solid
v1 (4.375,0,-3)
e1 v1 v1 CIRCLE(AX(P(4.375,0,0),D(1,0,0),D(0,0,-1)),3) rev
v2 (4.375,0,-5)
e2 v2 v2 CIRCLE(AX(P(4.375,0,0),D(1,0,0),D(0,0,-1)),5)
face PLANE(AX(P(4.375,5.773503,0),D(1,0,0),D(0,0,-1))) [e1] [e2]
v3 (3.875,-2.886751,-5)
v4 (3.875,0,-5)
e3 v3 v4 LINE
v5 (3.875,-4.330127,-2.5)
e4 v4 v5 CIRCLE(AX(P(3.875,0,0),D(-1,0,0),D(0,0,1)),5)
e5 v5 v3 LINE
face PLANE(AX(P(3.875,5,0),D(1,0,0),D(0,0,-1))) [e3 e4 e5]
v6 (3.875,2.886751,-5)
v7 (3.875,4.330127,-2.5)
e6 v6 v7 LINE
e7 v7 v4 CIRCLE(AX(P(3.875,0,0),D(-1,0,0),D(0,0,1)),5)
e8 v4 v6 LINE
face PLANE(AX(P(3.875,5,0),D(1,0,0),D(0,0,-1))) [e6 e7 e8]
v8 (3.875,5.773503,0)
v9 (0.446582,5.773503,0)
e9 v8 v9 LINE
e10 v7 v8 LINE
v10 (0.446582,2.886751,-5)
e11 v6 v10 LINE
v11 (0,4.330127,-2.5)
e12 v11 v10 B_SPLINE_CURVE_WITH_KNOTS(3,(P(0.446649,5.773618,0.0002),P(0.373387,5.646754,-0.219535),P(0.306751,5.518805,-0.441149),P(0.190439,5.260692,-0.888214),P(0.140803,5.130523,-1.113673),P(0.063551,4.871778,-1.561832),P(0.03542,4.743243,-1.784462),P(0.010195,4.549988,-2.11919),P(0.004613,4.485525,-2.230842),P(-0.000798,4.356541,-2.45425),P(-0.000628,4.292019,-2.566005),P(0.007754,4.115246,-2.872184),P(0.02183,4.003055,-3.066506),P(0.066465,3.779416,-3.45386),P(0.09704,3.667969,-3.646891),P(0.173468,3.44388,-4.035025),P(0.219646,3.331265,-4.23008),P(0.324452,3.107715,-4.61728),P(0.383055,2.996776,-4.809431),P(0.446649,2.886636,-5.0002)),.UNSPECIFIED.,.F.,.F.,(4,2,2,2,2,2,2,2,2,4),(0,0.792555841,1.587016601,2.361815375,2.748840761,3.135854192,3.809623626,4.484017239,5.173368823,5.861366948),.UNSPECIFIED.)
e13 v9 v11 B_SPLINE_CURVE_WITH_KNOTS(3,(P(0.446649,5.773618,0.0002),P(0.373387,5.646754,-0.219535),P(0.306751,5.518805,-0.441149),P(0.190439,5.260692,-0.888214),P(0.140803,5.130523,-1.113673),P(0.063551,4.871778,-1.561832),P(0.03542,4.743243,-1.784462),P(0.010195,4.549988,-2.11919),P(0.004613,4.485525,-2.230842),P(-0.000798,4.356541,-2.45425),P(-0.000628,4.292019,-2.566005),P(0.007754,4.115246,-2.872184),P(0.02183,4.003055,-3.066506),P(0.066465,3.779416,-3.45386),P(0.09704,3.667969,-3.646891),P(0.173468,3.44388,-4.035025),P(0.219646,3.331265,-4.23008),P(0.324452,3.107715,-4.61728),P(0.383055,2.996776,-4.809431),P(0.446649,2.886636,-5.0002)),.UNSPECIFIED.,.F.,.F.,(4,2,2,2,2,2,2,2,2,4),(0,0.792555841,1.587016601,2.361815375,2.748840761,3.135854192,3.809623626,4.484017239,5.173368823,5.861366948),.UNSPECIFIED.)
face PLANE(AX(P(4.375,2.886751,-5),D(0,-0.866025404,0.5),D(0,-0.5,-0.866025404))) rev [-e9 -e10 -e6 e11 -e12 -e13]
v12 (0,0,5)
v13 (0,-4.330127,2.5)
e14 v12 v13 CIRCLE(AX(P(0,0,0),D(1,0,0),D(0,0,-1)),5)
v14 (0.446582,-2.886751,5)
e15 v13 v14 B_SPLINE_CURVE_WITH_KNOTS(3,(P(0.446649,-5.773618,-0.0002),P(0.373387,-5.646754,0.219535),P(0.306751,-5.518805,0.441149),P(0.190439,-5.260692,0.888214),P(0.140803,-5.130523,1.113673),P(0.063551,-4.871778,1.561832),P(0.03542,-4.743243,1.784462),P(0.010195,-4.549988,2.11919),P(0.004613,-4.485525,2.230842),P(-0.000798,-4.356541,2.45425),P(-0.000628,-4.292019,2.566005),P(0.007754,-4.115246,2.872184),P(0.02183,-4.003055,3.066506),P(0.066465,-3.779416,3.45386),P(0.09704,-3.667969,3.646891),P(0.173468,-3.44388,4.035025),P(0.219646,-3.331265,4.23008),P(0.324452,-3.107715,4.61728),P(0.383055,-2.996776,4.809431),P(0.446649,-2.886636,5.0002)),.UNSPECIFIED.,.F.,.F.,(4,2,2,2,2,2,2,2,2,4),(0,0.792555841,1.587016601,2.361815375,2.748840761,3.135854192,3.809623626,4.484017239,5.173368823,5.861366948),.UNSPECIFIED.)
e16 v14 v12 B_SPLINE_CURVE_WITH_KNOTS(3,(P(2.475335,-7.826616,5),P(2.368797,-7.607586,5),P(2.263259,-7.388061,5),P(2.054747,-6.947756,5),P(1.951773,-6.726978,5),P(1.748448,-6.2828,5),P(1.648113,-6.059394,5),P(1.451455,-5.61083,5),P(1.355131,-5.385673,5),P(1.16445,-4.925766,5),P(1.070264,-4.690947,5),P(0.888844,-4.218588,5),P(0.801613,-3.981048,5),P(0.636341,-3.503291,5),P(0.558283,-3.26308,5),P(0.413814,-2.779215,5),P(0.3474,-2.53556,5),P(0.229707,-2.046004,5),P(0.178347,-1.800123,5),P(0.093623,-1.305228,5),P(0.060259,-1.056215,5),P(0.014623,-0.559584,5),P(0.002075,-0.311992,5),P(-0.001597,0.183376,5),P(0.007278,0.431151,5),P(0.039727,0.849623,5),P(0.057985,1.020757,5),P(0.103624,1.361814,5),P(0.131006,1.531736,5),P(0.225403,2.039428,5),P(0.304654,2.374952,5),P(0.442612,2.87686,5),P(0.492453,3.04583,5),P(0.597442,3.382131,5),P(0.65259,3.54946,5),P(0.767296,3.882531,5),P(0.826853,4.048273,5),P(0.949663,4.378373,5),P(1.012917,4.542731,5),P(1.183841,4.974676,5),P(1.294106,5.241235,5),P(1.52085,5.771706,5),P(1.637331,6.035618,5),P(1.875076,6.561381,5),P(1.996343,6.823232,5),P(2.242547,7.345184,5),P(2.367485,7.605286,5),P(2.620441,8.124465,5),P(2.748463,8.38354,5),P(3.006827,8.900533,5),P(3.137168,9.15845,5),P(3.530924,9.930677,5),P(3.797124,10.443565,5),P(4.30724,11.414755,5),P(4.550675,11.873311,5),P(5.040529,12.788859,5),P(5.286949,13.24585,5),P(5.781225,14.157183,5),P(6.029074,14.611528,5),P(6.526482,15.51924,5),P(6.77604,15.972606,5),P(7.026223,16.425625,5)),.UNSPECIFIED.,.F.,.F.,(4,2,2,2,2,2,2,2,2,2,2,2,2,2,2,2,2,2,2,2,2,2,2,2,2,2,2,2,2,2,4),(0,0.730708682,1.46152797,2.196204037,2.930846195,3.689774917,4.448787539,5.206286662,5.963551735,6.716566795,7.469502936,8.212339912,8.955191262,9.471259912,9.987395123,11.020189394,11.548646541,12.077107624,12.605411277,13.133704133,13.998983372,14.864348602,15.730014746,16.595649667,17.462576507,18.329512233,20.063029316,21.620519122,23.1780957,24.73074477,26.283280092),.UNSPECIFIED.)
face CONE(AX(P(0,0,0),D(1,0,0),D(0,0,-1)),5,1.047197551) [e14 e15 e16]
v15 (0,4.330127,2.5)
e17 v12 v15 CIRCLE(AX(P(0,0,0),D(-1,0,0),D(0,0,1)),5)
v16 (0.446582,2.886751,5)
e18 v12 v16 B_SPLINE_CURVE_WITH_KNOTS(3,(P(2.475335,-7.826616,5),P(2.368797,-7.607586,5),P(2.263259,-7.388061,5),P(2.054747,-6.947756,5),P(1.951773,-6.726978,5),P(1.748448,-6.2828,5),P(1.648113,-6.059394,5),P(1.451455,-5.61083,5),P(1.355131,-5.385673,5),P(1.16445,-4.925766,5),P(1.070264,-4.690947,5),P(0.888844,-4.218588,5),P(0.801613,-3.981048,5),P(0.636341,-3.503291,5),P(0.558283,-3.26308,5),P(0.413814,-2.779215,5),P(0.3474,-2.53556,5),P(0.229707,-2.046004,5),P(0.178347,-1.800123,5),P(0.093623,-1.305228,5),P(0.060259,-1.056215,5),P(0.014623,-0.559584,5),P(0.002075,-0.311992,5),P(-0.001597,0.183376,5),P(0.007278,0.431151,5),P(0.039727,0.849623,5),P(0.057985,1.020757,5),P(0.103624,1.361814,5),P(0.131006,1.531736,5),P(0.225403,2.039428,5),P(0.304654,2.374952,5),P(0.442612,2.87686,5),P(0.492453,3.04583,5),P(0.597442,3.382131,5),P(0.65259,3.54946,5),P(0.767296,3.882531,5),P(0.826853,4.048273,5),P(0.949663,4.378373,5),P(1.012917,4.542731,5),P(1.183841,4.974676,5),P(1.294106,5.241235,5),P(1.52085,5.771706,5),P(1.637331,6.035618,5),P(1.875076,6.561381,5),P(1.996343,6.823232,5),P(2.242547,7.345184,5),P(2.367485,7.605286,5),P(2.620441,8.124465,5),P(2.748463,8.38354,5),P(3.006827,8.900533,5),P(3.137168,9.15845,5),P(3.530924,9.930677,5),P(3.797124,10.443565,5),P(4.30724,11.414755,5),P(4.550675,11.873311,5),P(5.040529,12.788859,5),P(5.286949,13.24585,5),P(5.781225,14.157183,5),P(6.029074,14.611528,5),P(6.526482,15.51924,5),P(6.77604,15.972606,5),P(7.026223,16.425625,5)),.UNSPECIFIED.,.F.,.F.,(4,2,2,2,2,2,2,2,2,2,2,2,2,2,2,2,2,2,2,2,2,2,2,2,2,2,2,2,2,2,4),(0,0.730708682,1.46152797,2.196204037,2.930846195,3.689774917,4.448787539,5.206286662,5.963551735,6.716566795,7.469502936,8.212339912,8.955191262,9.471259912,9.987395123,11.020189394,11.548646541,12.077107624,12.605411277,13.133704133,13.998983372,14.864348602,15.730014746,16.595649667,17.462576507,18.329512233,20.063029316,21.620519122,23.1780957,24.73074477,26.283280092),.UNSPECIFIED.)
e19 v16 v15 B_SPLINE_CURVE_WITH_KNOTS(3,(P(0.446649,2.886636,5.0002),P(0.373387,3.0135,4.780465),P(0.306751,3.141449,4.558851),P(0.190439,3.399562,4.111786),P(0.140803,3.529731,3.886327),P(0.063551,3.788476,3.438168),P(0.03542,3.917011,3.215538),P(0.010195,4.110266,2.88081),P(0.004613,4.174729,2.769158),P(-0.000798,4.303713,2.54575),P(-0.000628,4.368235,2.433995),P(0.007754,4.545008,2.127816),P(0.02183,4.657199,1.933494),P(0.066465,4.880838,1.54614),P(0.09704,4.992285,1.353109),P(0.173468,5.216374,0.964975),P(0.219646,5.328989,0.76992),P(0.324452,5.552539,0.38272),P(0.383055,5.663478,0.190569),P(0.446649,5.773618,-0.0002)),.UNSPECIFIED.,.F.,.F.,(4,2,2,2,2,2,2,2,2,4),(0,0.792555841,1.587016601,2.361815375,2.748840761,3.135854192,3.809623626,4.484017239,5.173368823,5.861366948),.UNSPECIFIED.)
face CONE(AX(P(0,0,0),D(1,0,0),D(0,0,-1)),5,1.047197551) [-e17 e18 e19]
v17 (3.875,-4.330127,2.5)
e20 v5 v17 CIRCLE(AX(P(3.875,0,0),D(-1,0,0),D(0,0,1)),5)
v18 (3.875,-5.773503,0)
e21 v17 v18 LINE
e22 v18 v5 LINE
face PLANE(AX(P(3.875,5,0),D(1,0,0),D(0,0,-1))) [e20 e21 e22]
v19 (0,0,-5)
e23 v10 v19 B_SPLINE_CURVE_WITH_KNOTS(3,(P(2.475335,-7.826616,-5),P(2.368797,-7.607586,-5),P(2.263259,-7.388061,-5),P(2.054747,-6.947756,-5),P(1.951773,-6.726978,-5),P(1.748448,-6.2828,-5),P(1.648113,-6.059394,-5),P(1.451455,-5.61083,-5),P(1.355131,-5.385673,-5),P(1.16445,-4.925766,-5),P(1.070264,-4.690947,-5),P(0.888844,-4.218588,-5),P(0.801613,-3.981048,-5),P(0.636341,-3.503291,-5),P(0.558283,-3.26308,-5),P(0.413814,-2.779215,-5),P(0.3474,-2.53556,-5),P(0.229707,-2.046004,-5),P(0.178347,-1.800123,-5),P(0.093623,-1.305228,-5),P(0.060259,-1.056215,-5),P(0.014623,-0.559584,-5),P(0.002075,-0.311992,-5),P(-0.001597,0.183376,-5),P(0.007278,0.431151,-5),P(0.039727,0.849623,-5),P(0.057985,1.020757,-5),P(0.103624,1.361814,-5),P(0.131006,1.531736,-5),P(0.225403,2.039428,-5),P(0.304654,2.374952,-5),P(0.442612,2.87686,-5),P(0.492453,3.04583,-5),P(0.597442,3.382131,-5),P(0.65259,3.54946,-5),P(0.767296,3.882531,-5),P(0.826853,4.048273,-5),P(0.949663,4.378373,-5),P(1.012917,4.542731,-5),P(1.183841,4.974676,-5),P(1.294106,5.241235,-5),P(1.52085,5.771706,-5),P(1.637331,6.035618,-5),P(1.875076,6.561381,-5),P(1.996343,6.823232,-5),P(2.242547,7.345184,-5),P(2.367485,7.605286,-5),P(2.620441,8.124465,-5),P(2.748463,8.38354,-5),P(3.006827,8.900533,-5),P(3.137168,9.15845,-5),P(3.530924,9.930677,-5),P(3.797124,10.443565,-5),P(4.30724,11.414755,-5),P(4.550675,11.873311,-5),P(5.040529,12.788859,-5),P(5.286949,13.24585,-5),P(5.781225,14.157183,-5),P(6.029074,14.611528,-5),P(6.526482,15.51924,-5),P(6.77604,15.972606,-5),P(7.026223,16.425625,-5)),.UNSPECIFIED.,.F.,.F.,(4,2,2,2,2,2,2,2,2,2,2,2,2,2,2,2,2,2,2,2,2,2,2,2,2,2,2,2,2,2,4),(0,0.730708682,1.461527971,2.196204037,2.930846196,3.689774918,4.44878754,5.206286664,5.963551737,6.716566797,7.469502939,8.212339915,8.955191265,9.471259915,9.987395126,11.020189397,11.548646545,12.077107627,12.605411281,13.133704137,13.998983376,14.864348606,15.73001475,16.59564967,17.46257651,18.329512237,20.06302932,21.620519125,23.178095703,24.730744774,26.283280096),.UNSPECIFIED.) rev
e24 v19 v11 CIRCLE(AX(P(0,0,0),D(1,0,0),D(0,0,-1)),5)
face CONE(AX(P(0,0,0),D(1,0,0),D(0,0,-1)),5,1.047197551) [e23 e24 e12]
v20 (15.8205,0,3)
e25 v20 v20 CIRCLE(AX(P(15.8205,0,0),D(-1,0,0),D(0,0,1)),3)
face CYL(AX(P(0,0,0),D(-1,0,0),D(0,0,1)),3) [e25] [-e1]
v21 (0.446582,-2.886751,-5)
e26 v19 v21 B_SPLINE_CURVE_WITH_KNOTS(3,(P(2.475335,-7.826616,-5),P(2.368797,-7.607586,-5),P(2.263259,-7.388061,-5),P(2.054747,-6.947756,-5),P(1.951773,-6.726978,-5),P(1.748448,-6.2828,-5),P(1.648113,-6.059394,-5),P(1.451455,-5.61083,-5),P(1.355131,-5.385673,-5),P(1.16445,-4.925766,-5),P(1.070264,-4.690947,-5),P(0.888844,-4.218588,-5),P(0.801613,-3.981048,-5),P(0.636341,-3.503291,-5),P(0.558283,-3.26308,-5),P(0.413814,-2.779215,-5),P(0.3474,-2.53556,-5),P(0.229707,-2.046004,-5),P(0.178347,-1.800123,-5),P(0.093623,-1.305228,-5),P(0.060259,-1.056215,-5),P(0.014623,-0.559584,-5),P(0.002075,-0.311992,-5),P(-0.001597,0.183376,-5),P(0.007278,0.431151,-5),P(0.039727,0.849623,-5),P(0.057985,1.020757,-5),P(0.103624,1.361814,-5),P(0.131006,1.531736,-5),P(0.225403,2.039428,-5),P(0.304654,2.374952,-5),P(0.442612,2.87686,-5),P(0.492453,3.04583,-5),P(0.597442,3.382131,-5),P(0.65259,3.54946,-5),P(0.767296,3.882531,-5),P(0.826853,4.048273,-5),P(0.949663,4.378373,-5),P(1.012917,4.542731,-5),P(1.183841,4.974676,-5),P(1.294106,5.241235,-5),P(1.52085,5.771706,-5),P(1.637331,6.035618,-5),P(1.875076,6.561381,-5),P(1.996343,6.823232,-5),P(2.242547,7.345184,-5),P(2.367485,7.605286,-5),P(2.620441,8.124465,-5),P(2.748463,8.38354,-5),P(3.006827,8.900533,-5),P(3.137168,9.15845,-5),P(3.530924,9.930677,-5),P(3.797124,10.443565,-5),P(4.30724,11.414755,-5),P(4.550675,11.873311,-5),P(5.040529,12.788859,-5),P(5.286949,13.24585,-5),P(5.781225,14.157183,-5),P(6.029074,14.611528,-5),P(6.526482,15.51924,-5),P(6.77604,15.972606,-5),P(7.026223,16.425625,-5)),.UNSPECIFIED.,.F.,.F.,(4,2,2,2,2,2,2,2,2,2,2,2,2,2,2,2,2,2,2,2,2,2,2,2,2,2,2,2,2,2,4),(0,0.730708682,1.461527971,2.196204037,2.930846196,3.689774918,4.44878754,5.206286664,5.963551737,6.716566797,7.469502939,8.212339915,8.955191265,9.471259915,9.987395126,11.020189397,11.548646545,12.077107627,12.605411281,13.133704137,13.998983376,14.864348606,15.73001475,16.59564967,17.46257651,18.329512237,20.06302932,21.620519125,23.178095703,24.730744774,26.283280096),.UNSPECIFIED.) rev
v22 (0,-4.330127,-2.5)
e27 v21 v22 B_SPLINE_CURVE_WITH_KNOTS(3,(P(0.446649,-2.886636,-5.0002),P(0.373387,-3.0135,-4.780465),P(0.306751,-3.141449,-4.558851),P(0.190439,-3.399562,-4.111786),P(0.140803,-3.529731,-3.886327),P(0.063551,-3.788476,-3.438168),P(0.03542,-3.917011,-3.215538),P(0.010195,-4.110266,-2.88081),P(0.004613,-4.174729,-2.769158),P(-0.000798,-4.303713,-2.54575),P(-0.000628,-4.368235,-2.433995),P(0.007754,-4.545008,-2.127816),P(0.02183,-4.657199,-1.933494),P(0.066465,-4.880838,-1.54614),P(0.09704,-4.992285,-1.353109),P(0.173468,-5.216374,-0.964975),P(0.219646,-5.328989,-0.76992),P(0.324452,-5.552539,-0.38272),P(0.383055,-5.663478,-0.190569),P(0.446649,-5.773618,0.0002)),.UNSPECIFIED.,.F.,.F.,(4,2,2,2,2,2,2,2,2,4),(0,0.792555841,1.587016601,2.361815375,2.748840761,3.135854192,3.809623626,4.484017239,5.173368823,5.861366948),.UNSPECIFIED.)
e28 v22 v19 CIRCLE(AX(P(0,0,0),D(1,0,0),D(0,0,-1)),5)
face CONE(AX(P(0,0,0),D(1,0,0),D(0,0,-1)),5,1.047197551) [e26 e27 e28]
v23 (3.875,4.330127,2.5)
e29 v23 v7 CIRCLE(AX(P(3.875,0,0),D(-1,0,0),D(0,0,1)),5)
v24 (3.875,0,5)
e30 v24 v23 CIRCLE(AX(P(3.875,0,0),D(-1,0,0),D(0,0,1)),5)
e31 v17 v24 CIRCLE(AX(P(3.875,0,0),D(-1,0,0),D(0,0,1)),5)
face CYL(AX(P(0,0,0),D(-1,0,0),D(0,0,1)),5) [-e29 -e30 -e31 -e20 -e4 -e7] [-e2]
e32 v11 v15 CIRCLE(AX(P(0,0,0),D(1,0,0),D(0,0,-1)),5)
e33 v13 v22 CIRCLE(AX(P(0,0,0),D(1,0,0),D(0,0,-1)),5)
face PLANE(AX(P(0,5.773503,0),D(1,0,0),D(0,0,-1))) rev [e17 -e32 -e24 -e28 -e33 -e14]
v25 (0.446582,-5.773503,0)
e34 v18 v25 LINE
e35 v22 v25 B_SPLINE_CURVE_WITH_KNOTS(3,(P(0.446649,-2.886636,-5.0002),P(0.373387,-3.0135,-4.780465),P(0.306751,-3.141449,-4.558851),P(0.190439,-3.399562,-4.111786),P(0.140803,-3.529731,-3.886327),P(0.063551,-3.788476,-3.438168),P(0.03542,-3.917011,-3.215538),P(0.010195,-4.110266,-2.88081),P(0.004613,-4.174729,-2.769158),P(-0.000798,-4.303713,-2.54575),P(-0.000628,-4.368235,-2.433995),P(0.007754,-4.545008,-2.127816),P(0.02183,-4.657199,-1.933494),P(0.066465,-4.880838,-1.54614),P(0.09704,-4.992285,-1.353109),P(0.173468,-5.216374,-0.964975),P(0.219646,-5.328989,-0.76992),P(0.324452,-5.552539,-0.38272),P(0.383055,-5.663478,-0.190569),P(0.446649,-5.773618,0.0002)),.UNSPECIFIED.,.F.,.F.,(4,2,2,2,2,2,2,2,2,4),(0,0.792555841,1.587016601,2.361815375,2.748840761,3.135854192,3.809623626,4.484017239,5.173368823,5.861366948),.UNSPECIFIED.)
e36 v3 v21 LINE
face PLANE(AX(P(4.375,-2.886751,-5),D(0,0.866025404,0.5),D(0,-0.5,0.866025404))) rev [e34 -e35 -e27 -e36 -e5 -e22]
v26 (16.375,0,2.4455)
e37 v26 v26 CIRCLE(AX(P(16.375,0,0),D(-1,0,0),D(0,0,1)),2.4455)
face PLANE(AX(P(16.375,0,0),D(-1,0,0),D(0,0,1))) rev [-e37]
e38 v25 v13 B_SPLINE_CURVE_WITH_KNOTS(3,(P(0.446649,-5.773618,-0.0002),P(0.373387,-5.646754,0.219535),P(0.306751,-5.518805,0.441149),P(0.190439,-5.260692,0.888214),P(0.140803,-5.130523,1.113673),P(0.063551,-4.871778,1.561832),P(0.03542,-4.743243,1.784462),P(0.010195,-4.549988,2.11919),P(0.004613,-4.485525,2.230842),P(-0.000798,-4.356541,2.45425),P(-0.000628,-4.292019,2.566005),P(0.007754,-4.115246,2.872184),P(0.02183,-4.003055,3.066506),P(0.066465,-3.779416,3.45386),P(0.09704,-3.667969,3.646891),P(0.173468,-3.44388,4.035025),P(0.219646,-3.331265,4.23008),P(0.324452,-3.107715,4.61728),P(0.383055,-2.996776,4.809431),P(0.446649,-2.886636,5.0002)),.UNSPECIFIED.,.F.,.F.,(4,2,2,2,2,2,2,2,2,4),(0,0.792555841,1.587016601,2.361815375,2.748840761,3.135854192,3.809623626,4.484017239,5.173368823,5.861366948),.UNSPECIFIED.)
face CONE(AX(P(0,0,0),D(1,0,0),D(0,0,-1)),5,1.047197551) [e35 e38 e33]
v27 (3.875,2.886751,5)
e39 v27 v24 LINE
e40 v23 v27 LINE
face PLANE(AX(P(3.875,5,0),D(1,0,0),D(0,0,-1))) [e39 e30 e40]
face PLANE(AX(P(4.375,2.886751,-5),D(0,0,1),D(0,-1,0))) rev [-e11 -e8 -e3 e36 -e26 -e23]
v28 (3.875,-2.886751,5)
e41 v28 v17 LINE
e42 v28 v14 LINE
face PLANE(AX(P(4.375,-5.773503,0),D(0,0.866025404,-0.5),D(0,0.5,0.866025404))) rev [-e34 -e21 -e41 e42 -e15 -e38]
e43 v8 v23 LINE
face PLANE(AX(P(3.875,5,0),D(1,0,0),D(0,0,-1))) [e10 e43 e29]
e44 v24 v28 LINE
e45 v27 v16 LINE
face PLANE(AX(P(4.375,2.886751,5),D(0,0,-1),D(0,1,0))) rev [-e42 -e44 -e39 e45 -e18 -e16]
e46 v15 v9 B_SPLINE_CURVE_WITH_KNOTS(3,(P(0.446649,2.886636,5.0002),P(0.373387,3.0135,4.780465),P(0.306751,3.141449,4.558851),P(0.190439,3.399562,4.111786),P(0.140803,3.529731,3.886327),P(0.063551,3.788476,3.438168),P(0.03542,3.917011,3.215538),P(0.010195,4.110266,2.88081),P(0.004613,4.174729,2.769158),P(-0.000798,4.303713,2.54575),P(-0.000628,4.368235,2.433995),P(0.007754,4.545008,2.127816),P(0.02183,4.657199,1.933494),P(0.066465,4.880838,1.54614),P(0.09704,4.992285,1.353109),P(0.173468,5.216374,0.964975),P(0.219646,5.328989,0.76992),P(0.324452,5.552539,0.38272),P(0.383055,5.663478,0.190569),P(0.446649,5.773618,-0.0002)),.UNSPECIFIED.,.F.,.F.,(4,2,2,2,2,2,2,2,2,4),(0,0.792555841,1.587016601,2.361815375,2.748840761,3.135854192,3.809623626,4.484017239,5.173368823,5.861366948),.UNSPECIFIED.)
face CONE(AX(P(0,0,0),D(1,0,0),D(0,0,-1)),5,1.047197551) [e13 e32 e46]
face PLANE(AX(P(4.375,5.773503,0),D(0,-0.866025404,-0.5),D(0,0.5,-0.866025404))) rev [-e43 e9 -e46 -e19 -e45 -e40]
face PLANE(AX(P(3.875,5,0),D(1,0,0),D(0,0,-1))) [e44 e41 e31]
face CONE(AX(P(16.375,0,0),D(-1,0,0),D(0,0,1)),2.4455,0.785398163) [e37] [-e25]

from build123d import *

# Parameters (mm, degrees)
BASEHEAD_DEPTH = 4.375
SKETCH4_W      = 0.5
SKETCH4_H      = 10.773502692


# Read off the part's stored shape, not the designer's step: HeadChamfer
with BuildPart() as part:
    # Sketch1 → BaseHead (new body)
    with BuildSketch(Plane(origin=(0, 0, 0), x_dir=(0, 0, -1), z_dir=(1, 0, 0))):
        Polygon((5, 2.886751346), (5, -2.886751346), (0, -5.773502692), (-5, -2.886751346), (-5, 2.886751346), (0, 5.773502692), align=None)
    extrude(amount=BASEHEAD_DEPTH)

    # HeadChamfer outline → HeadChamfer (revolve, cut)
    with BuildSketch(Plane.YX):
        Polygon((5.773502688, 0.446581985), (4.999998827, -6.77e-07), (5.773502692, -8.45e-07), align=None)
    revolve(axis=Axis((0, 0, 0), (1, 0, 0)), mode=Mode.SUBTRACT)

    # HeadChamfer 2 outline → HeadChamfer 2 (revolve)
    with BuildSketch(Plane.YX):
        Polygon((3, 4.375), (3, 15.8205), (2.4455, 16.375), (0, 16.375), (0, 4.375), align=None)
    revolve(axis=Axis((0, 0, 0), (1, 0, 0)))

    # Sketch4 → BearingFace (revolve, cut)
    with BuildSketch(Plane.XY, mode=Mode.PRIVATE) as bearingface_sk:
        with Locations((4.125, 10.386751346)):
            Rectangle(SKETCH4_W, SKETCH4_H)
    revolve(bearingface_sk.sketch.rotate(Axis((0, 0, 0), (1, 0, 0)), 90), axis=Axis((0, 0, 0), (1, 0, 0)), mode=Mode.SUBTRACT)


solid = part.part
